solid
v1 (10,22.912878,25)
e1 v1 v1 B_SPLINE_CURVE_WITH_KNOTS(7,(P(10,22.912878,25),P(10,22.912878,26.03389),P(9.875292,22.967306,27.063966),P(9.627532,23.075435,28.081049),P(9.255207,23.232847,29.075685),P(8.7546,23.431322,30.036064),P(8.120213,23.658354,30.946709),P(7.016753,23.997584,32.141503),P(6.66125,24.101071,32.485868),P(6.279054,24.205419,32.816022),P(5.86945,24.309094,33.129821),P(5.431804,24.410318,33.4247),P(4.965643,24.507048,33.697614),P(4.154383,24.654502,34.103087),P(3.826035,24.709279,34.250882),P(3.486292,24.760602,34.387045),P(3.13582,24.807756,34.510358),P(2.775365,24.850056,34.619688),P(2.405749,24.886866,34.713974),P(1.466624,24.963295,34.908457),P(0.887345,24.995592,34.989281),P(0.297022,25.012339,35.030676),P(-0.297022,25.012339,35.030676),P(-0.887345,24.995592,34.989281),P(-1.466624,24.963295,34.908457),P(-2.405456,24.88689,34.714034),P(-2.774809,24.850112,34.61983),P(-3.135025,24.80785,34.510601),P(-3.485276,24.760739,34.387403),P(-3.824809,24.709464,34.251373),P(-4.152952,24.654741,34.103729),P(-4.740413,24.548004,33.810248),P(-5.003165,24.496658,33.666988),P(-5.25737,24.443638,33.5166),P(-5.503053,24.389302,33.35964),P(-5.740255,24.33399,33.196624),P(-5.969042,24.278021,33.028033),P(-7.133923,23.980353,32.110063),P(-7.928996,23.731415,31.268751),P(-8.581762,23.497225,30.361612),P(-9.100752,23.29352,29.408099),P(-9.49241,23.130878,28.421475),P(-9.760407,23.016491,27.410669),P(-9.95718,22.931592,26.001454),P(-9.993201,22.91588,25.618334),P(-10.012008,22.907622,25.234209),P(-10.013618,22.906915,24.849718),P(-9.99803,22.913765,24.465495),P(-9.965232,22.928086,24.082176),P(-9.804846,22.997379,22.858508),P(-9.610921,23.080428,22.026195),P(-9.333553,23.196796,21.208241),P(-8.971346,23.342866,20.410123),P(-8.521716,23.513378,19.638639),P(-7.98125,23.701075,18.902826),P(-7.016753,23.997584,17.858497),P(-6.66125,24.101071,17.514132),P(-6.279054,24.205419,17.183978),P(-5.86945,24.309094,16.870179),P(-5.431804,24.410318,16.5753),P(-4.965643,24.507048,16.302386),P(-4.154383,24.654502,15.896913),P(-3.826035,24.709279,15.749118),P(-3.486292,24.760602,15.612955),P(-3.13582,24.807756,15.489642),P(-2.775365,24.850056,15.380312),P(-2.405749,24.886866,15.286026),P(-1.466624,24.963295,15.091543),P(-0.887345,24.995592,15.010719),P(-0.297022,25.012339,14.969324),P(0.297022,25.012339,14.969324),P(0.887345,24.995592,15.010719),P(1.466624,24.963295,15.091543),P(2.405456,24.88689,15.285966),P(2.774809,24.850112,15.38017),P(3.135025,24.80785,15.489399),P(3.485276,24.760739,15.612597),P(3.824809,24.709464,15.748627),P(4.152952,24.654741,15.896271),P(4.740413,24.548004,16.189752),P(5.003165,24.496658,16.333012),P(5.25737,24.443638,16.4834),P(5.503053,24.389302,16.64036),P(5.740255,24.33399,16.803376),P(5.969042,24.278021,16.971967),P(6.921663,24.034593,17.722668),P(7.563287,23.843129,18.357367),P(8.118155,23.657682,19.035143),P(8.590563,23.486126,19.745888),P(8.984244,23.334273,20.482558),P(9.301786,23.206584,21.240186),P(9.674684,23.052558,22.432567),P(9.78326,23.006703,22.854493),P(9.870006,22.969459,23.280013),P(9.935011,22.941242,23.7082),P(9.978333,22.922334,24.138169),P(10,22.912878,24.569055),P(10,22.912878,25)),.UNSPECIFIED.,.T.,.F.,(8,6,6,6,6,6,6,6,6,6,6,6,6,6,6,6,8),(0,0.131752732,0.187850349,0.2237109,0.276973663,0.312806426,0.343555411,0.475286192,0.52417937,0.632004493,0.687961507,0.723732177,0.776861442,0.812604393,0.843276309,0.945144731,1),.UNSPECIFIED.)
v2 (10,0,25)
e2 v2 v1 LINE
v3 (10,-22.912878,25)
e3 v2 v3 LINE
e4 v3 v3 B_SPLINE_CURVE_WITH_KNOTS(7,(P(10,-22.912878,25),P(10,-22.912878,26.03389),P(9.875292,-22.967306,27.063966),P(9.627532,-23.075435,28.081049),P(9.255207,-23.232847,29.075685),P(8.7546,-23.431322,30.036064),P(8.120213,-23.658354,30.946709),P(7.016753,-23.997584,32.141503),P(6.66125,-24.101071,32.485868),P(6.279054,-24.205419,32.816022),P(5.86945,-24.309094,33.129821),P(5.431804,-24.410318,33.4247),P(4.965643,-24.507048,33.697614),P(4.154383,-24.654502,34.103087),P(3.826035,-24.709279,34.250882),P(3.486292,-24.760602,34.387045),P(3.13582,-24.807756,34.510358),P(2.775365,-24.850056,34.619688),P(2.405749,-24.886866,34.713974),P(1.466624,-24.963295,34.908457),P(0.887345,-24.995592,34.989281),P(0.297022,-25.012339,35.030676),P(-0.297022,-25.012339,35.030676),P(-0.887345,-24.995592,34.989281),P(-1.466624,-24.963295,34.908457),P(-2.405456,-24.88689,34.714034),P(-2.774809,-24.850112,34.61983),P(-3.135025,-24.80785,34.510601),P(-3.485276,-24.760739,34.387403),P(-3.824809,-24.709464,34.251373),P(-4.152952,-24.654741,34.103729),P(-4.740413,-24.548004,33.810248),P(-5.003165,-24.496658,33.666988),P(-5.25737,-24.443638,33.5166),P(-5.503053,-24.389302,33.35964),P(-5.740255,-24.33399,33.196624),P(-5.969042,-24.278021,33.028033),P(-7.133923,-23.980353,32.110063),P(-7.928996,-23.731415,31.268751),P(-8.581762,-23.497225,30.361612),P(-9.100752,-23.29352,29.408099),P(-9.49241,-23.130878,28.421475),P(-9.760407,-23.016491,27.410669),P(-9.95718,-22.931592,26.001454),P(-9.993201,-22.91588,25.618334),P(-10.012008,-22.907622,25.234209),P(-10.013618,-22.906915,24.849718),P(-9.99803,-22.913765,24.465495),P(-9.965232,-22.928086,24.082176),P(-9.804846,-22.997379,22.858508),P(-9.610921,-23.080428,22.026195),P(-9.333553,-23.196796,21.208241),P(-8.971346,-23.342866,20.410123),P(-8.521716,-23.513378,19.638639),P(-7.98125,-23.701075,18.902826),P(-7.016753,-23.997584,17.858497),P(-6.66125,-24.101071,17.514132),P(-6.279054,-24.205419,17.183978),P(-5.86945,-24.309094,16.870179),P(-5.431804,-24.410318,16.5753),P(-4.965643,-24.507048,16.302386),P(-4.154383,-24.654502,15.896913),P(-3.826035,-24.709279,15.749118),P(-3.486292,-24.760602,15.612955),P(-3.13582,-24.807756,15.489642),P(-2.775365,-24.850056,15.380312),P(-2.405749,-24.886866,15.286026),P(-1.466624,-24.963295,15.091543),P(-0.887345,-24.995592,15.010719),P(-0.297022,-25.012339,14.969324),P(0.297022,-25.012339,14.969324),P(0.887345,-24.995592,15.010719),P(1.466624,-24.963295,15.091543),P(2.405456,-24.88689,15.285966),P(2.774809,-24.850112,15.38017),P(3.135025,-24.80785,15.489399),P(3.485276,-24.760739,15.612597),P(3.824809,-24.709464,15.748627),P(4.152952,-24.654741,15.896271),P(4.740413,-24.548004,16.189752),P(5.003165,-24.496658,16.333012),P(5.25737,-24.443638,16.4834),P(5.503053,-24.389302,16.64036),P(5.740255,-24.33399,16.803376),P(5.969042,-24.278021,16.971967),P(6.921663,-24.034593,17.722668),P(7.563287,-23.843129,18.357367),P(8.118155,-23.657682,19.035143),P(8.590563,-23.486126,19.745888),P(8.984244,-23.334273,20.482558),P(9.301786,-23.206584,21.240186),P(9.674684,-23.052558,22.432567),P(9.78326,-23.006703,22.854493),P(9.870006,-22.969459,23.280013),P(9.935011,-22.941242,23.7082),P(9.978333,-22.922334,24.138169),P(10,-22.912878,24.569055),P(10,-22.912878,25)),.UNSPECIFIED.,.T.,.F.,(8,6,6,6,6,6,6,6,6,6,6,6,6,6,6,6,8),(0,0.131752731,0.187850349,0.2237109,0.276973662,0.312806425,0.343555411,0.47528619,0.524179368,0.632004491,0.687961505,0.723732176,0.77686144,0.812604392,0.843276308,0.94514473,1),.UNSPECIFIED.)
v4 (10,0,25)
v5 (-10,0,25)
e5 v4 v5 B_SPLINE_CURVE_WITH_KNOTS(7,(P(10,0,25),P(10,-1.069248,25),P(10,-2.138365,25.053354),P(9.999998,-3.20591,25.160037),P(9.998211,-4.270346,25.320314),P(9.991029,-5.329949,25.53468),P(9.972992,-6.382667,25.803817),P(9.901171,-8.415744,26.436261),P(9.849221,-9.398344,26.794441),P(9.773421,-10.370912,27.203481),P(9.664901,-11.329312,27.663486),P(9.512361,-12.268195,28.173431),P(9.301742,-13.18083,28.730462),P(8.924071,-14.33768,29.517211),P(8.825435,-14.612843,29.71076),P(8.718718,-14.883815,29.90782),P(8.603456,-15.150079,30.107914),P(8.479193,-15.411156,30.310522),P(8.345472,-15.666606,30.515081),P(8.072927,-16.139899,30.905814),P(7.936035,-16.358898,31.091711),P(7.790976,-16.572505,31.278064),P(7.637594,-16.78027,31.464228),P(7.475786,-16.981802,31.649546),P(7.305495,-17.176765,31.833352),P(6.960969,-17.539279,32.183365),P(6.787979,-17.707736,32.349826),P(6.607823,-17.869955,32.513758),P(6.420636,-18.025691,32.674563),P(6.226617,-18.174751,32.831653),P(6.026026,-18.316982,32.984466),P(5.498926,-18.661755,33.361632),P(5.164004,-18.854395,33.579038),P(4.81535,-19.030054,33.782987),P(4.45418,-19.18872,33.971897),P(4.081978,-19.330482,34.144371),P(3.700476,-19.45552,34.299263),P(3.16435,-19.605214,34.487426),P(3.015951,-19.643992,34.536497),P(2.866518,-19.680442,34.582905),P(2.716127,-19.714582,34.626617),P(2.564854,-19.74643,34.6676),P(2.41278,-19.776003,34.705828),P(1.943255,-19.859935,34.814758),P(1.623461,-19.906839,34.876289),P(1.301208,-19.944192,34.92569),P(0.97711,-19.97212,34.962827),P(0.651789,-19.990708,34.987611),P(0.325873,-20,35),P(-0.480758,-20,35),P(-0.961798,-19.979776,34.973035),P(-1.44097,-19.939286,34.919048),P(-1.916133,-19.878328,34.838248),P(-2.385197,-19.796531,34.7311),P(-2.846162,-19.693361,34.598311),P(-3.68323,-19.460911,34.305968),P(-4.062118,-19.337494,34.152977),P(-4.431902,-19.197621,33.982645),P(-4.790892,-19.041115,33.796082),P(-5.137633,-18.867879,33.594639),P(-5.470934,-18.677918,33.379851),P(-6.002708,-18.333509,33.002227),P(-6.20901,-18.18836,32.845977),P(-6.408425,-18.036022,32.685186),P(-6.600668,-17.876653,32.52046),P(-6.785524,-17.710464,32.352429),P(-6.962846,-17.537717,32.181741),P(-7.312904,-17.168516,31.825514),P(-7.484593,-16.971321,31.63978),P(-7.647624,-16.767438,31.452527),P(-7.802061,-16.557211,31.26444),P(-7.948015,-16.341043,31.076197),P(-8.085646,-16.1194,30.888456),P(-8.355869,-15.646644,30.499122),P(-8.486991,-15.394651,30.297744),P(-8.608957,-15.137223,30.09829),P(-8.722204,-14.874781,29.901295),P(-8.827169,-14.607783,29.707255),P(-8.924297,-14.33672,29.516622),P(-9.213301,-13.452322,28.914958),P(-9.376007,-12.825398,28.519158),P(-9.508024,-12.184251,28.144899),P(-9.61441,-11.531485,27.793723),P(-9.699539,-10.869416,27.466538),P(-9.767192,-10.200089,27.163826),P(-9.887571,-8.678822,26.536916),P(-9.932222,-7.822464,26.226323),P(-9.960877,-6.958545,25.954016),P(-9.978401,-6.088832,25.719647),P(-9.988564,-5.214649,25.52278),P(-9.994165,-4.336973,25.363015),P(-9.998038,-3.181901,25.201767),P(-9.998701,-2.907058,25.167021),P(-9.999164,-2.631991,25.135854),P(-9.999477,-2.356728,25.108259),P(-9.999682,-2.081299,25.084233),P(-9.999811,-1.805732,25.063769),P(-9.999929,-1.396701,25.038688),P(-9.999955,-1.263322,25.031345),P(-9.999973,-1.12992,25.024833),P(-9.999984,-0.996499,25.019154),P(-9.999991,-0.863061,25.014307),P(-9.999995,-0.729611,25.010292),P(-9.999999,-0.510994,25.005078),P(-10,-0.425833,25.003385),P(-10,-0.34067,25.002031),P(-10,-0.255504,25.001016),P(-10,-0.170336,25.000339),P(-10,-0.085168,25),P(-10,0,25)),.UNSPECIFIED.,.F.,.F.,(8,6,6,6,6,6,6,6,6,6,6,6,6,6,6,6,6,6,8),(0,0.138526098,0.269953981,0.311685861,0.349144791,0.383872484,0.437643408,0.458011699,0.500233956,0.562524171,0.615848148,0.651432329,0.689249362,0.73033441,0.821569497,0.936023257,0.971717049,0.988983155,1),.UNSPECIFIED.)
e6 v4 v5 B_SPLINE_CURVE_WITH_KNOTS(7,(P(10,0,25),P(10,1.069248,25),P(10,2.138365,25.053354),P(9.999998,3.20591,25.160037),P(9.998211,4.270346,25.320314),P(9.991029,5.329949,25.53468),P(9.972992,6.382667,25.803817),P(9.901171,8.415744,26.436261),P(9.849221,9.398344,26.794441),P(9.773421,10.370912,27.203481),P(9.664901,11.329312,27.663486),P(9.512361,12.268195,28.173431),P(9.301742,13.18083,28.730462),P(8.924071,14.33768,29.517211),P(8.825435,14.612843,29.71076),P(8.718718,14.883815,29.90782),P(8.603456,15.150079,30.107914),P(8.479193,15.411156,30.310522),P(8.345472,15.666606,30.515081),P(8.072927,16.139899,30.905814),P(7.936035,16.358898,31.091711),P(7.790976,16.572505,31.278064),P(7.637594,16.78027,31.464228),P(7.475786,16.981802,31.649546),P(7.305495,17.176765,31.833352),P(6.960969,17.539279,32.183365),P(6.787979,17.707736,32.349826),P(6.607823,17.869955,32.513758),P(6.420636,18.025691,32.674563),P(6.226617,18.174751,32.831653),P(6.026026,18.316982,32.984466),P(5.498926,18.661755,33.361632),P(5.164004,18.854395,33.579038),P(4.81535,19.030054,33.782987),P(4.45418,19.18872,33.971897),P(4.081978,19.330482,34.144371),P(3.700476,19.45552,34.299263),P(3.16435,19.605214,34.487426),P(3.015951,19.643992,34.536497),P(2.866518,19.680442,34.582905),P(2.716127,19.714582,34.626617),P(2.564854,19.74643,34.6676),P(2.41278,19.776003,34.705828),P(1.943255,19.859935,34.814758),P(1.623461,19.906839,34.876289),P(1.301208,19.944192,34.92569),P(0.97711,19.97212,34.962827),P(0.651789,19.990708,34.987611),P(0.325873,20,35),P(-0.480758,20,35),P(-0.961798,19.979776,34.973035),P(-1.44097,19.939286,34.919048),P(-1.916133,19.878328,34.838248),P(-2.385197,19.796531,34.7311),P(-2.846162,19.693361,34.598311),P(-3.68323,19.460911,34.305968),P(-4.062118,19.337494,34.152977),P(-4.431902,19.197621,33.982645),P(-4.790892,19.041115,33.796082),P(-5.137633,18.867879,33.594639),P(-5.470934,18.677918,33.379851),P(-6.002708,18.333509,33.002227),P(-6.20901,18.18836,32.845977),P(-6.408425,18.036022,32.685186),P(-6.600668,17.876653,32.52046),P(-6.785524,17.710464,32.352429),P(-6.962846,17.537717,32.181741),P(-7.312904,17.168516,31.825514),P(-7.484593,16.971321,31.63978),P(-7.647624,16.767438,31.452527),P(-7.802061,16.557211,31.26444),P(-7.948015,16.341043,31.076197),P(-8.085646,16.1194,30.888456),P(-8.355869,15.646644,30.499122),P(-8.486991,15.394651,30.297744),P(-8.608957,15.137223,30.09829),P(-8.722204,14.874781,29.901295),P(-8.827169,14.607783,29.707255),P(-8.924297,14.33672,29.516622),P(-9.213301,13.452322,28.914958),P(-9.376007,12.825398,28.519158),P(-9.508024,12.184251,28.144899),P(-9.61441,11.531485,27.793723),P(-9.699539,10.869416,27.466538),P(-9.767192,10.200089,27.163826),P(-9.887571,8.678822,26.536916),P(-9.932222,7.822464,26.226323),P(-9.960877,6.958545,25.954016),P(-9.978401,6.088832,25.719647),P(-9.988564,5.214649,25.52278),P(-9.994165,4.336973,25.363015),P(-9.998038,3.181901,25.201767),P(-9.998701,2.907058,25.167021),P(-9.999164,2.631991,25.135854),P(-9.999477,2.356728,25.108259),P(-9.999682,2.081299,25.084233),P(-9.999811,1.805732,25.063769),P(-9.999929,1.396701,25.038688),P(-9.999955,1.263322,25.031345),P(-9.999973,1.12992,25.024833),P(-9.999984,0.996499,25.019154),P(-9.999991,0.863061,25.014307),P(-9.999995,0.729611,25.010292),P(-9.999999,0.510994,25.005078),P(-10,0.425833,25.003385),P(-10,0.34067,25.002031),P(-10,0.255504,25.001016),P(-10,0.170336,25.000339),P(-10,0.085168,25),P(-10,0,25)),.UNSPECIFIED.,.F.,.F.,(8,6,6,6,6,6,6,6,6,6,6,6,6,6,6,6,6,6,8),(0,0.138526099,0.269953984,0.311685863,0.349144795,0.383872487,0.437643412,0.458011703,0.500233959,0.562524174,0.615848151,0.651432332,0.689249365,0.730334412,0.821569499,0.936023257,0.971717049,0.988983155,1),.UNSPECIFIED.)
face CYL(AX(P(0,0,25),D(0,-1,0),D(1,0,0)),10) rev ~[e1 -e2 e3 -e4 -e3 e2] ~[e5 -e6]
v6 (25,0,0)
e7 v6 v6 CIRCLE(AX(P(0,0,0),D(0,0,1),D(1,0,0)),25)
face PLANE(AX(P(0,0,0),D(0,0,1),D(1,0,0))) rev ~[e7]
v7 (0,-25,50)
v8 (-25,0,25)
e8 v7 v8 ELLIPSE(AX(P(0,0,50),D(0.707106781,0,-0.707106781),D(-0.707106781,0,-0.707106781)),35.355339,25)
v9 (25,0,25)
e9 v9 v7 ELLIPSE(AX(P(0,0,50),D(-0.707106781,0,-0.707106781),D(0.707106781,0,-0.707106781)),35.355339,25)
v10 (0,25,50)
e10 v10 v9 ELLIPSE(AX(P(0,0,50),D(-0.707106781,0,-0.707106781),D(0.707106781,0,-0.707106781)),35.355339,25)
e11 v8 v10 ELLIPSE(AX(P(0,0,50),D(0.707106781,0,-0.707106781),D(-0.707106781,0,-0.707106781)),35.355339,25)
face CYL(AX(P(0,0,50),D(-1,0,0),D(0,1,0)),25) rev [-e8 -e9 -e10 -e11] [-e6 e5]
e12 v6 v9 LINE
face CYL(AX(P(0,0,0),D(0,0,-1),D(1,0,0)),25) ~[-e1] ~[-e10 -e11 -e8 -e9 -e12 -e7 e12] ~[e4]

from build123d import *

# Parameters (mm, degrees)
F0_R          = 25
F1_DEPTH      = 50
F3_DEPTH      = 25.001
F3_DEPTH_BACK = 25.001
F4_R          = 10
F5_DEPTH      = 25.001
F5_DEPTH_BACK = 25.001


with BuildPart() as f1:
    # F0 (on Top) → F1 (new body)
    with BuildSketch(Plane.XY):
        Circle(F0_R)
    extrude(amount=F1_DEPTH)

    # F2 (on Right) → F3 (cut, two sides)
    with BuildSketch(Plane.YZ) as f3_sk:
        with BuildLine():
            ThreePointArc((-25, 50), (0, 25), (25, 50))
            ThreePointArc((25, 50), (0, 75), (-25, 50))
        make_face()
    extrude(amount=-F3_DEPTH, mode=Mode.SUBTRACT)
    extrude(f3_sk.sketch, amount=F3_DEPTH_BACK, mode=Mode.SUBTRACT)

    # F4 (on Front) → F5 (cut, two sides)
    with BuildSketch(Plane.XZ) as f5_sk:
        with Locations((0, 25)):
            Circle(F4_R)
    extrude(amount=F5_DEPTH, mode=Mode.SUBTRACT)
    extrude(f5_sk.sketch, amount=-F5_DEPTH_BACK, mode=Mode.SUBTRACT)


solid = f1.part
